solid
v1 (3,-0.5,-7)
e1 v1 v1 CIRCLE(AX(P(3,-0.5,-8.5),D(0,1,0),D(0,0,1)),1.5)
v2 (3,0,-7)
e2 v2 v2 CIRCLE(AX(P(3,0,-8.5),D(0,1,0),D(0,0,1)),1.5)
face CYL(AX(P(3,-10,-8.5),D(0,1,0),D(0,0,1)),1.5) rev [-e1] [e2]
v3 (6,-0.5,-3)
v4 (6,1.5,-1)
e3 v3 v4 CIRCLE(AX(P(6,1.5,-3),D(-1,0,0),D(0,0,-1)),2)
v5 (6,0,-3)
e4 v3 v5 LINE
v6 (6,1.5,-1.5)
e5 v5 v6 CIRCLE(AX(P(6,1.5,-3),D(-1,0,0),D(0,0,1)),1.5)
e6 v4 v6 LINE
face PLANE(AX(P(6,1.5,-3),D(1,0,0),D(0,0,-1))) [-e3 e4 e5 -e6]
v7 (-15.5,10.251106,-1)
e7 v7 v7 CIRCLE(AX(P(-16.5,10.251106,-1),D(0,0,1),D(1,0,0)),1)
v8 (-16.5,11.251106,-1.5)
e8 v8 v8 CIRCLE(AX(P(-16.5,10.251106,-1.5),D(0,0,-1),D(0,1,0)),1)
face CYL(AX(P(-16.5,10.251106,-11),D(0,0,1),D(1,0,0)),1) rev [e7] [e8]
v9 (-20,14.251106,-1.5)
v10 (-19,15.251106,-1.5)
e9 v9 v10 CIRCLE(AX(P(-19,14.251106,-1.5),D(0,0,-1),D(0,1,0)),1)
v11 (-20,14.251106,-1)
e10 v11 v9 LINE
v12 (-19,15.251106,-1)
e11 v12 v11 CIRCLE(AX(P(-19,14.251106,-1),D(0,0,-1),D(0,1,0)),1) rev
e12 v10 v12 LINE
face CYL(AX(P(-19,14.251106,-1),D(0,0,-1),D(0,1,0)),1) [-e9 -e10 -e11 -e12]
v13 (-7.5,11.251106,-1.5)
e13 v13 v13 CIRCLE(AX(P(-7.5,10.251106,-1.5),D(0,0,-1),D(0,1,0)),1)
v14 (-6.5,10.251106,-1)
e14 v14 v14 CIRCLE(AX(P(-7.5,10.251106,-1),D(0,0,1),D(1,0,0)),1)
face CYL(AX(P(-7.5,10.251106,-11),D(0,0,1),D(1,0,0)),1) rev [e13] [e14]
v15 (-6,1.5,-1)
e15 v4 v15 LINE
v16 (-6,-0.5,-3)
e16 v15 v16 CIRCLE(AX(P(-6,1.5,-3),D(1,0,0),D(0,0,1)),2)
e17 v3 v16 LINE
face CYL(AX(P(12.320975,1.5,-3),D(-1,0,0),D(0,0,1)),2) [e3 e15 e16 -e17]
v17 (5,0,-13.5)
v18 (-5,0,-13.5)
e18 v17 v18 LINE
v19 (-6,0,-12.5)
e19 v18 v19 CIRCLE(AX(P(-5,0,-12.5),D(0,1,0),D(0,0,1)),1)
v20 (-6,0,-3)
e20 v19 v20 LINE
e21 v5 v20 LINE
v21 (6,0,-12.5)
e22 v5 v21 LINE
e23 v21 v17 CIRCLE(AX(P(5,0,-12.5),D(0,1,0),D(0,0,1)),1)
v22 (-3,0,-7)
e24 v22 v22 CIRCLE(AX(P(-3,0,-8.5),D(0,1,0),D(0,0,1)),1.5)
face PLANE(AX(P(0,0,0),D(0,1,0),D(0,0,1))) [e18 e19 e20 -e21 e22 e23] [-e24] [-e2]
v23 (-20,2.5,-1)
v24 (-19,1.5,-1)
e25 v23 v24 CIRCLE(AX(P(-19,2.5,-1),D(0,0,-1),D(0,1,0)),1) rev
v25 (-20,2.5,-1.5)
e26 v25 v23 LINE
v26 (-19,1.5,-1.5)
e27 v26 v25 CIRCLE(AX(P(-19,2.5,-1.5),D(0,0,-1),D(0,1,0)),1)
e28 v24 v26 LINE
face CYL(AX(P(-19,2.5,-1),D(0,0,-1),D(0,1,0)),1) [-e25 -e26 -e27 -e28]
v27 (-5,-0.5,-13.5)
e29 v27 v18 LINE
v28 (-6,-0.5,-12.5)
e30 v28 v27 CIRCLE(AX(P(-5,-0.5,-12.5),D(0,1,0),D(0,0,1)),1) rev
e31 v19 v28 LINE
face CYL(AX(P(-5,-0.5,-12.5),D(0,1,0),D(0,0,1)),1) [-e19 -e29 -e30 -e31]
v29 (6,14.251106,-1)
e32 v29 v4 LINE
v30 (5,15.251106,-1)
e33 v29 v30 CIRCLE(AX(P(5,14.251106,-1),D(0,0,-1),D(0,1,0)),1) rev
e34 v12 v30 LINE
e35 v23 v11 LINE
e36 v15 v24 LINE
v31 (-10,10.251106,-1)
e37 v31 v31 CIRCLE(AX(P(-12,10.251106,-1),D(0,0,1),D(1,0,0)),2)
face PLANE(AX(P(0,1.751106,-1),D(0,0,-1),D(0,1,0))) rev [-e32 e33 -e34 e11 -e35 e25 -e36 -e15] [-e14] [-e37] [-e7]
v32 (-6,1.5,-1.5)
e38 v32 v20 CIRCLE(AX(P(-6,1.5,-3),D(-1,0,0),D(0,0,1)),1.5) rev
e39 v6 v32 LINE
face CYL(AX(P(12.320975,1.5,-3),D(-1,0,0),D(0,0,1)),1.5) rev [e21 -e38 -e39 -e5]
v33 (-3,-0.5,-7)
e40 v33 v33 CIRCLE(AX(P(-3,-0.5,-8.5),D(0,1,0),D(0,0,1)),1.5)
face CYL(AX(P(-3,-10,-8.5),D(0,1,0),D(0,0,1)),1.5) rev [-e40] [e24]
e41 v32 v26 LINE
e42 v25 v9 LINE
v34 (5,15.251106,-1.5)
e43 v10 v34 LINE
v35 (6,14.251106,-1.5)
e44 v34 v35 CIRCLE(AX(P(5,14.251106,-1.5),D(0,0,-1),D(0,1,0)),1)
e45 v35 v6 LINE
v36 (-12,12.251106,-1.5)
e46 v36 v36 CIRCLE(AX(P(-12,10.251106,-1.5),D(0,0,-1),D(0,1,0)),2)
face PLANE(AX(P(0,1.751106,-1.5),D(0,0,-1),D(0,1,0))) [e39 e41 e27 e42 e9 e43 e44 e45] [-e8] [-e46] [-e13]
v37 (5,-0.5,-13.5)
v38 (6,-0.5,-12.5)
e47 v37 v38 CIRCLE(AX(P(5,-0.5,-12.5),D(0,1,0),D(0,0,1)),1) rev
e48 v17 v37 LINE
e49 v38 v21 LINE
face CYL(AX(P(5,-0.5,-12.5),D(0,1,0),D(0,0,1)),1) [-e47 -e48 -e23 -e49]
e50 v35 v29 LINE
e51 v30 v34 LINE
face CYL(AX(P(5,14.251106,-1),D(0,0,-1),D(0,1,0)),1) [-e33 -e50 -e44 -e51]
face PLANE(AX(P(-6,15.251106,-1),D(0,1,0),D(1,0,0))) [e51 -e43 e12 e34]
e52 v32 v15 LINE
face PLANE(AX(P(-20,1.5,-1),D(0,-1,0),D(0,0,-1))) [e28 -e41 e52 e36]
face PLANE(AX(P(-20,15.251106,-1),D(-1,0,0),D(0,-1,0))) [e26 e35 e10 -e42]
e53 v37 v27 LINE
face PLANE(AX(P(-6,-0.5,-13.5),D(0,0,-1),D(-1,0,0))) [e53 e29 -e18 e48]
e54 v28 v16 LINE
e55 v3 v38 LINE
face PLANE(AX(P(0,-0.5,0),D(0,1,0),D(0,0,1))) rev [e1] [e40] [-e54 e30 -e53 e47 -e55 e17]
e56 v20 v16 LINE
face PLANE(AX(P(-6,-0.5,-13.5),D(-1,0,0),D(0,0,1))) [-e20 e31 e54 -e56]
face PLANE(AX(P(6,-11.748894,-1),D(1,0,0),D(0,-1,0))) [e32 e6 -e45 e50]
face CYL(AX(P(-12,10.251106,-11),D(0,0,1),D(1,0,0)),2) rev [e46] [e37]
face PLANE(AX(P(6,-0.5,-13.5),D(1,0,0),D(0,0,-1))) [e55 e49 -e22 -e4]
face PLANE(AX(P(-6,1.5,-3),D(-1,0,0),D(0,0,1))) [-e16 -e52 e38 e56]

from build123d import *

# Parameters (mm, degrees)
SKETCH1_W              = 12
SKETCH1_H              = 27
BASE_FLANGE1_DEPTH     = 0.5
SKETCHED_START         = -6
SKETCHED_BEND1_DEPTH   = 12
SKETCHED_BEND1_2_DEPTH = 12
TAB1_START             = -0.5
TAB1_OUTLINE_W         = 14
TAB1_OUTLINE_H         = 13.751106428
TAB1_DEPTH             = 0.5
SKETCH8_R              = 1
SKETCH8_R_2            = 2
CUT_EXTRUDE1_DEPTH     = 10
SKETCH9_R              = 1.5
CUT_EXTRUDE2_DEPTH     = 10
FILLET1_R              = 1


# Read off the part's stored shape, not the designer's step: Sketched Bend1, Tab1
# Sheet-metal steps are written as plain solids
with BuildPart() as part:
    # Sketch1 → Base-Flange1 (new body)
    with BuildSketch(Plane(origin=(0, 0, 0), x_dir=(1, 0, 0), z_dir=(0, 1, 0))):
        Rectangle(SKETCH1_W, SKETCH1_H)
    extrude(amount=-BASE_FLANGE1_DEPTH)

    # Sketched Bend1 outline → Sketched Bend1 (cut)
    with BuildSketch(Plane.YZ.offset(SKETCHED_START)):
        with BuildLine():
            ThreePointArc((-0.5, -3), (-0.370828693, -2.292893219), (0, -1.677124345))
            Line((0, -1.677124345), (0, 13.5))
            Line((0, 13.5), (-0.5, 13.5))
            Line((-0.5, 13.5), (-0.5, -3))
        make_face()
    extrude(amount=SKETCHED_BEND1_DEPTH, mode=Mode.SUBTRACT)

    # Sketched Bend1 2 outline → Sketched Bend1 2 (add)
    with BuildSketch(Plane.YZ.offset(SKETCHED_START)):
        with BuildLine():
            ThreePointArc((0, -3), (0.439339828, -1.939339828), (1.5, -1.5))
            Line((1.5, -1.5), (15.251106428, -1.5))
            Line((15.251106428, -1.5), (15.251106428, -1))
            Line((15.251106428, -1), (1.5, -1))
            ThreePointArc((1.5, -1), (0.677124344, -1.177124345), (0, -1.677124345))
            Line((0, -1.677124345), (0, -3))
        make_face()
    extrude(amount=SKETCHED_BEND1_2_DEPTH)

    # Tab1 outline → Tab1 (add)
    with BuildSketch(Plane(origin=(0, 0, -1.5), x_dir=(-1, 0, 0), z_dir=(0, 0, -1)).offset(TAB1_START)):
        with Locations((13, 8.375553214)):
            Rectangle(TAB1_OUTLINE_W, TAB1_OUTLINE_H)
    extrude(amount=TAB1_DEPTH)

    # Sketch8 → Cut-Extrude1 (cut)
    with BuildSketch(Plane.XY.offset(-1)):
        with Locations((-16.5, 10.251106428)):
            Circle(SKETCH8_R)
        with Locations((-7.5, 10.251106428)):
            Circle(SKETCH8_R)
        with Locations((-12, 10.251106428)):
            Circle(SKETCH8_R_2)
    extrude(amount=-CUT_EXTRUDE1_DEPTH, mode=Mode.SUBTRACT)

    # Sketch9 → Cut-Extrude2 (cut)
    with BuildSketch(Plane(origin=(0, 0, 0), x_dir=(1, 0, 0), z_dir=(0, 1, 0))):
        with Locations(Location((-3, 8.5, 0), (0, 0, 270))):
            Circle(SKETCH9_R)
        with Locations(Location((3, 8.5, 0), (0, 0, 270))):
            Circle(SKETCH9_R)
    extrude(amount=-CUT_EXTRUDE2_DEPTH, mode=Mode.SUBTRACT)

    # Fillet1
    fillet1_edges = [part.edges().sort_by_distance(p)[0] for p in [
        (-6, -0.25, -13.5),
        (6, -0.25, -13.5),
        (-20, 15.251106428, -1.25),
        (-20, 1.5, -1.25),
        (6, 15.251106428, -1.25),
    ]]
    fillet(fillet1_edges, radius=FILLET1_R)


solid = part.part
